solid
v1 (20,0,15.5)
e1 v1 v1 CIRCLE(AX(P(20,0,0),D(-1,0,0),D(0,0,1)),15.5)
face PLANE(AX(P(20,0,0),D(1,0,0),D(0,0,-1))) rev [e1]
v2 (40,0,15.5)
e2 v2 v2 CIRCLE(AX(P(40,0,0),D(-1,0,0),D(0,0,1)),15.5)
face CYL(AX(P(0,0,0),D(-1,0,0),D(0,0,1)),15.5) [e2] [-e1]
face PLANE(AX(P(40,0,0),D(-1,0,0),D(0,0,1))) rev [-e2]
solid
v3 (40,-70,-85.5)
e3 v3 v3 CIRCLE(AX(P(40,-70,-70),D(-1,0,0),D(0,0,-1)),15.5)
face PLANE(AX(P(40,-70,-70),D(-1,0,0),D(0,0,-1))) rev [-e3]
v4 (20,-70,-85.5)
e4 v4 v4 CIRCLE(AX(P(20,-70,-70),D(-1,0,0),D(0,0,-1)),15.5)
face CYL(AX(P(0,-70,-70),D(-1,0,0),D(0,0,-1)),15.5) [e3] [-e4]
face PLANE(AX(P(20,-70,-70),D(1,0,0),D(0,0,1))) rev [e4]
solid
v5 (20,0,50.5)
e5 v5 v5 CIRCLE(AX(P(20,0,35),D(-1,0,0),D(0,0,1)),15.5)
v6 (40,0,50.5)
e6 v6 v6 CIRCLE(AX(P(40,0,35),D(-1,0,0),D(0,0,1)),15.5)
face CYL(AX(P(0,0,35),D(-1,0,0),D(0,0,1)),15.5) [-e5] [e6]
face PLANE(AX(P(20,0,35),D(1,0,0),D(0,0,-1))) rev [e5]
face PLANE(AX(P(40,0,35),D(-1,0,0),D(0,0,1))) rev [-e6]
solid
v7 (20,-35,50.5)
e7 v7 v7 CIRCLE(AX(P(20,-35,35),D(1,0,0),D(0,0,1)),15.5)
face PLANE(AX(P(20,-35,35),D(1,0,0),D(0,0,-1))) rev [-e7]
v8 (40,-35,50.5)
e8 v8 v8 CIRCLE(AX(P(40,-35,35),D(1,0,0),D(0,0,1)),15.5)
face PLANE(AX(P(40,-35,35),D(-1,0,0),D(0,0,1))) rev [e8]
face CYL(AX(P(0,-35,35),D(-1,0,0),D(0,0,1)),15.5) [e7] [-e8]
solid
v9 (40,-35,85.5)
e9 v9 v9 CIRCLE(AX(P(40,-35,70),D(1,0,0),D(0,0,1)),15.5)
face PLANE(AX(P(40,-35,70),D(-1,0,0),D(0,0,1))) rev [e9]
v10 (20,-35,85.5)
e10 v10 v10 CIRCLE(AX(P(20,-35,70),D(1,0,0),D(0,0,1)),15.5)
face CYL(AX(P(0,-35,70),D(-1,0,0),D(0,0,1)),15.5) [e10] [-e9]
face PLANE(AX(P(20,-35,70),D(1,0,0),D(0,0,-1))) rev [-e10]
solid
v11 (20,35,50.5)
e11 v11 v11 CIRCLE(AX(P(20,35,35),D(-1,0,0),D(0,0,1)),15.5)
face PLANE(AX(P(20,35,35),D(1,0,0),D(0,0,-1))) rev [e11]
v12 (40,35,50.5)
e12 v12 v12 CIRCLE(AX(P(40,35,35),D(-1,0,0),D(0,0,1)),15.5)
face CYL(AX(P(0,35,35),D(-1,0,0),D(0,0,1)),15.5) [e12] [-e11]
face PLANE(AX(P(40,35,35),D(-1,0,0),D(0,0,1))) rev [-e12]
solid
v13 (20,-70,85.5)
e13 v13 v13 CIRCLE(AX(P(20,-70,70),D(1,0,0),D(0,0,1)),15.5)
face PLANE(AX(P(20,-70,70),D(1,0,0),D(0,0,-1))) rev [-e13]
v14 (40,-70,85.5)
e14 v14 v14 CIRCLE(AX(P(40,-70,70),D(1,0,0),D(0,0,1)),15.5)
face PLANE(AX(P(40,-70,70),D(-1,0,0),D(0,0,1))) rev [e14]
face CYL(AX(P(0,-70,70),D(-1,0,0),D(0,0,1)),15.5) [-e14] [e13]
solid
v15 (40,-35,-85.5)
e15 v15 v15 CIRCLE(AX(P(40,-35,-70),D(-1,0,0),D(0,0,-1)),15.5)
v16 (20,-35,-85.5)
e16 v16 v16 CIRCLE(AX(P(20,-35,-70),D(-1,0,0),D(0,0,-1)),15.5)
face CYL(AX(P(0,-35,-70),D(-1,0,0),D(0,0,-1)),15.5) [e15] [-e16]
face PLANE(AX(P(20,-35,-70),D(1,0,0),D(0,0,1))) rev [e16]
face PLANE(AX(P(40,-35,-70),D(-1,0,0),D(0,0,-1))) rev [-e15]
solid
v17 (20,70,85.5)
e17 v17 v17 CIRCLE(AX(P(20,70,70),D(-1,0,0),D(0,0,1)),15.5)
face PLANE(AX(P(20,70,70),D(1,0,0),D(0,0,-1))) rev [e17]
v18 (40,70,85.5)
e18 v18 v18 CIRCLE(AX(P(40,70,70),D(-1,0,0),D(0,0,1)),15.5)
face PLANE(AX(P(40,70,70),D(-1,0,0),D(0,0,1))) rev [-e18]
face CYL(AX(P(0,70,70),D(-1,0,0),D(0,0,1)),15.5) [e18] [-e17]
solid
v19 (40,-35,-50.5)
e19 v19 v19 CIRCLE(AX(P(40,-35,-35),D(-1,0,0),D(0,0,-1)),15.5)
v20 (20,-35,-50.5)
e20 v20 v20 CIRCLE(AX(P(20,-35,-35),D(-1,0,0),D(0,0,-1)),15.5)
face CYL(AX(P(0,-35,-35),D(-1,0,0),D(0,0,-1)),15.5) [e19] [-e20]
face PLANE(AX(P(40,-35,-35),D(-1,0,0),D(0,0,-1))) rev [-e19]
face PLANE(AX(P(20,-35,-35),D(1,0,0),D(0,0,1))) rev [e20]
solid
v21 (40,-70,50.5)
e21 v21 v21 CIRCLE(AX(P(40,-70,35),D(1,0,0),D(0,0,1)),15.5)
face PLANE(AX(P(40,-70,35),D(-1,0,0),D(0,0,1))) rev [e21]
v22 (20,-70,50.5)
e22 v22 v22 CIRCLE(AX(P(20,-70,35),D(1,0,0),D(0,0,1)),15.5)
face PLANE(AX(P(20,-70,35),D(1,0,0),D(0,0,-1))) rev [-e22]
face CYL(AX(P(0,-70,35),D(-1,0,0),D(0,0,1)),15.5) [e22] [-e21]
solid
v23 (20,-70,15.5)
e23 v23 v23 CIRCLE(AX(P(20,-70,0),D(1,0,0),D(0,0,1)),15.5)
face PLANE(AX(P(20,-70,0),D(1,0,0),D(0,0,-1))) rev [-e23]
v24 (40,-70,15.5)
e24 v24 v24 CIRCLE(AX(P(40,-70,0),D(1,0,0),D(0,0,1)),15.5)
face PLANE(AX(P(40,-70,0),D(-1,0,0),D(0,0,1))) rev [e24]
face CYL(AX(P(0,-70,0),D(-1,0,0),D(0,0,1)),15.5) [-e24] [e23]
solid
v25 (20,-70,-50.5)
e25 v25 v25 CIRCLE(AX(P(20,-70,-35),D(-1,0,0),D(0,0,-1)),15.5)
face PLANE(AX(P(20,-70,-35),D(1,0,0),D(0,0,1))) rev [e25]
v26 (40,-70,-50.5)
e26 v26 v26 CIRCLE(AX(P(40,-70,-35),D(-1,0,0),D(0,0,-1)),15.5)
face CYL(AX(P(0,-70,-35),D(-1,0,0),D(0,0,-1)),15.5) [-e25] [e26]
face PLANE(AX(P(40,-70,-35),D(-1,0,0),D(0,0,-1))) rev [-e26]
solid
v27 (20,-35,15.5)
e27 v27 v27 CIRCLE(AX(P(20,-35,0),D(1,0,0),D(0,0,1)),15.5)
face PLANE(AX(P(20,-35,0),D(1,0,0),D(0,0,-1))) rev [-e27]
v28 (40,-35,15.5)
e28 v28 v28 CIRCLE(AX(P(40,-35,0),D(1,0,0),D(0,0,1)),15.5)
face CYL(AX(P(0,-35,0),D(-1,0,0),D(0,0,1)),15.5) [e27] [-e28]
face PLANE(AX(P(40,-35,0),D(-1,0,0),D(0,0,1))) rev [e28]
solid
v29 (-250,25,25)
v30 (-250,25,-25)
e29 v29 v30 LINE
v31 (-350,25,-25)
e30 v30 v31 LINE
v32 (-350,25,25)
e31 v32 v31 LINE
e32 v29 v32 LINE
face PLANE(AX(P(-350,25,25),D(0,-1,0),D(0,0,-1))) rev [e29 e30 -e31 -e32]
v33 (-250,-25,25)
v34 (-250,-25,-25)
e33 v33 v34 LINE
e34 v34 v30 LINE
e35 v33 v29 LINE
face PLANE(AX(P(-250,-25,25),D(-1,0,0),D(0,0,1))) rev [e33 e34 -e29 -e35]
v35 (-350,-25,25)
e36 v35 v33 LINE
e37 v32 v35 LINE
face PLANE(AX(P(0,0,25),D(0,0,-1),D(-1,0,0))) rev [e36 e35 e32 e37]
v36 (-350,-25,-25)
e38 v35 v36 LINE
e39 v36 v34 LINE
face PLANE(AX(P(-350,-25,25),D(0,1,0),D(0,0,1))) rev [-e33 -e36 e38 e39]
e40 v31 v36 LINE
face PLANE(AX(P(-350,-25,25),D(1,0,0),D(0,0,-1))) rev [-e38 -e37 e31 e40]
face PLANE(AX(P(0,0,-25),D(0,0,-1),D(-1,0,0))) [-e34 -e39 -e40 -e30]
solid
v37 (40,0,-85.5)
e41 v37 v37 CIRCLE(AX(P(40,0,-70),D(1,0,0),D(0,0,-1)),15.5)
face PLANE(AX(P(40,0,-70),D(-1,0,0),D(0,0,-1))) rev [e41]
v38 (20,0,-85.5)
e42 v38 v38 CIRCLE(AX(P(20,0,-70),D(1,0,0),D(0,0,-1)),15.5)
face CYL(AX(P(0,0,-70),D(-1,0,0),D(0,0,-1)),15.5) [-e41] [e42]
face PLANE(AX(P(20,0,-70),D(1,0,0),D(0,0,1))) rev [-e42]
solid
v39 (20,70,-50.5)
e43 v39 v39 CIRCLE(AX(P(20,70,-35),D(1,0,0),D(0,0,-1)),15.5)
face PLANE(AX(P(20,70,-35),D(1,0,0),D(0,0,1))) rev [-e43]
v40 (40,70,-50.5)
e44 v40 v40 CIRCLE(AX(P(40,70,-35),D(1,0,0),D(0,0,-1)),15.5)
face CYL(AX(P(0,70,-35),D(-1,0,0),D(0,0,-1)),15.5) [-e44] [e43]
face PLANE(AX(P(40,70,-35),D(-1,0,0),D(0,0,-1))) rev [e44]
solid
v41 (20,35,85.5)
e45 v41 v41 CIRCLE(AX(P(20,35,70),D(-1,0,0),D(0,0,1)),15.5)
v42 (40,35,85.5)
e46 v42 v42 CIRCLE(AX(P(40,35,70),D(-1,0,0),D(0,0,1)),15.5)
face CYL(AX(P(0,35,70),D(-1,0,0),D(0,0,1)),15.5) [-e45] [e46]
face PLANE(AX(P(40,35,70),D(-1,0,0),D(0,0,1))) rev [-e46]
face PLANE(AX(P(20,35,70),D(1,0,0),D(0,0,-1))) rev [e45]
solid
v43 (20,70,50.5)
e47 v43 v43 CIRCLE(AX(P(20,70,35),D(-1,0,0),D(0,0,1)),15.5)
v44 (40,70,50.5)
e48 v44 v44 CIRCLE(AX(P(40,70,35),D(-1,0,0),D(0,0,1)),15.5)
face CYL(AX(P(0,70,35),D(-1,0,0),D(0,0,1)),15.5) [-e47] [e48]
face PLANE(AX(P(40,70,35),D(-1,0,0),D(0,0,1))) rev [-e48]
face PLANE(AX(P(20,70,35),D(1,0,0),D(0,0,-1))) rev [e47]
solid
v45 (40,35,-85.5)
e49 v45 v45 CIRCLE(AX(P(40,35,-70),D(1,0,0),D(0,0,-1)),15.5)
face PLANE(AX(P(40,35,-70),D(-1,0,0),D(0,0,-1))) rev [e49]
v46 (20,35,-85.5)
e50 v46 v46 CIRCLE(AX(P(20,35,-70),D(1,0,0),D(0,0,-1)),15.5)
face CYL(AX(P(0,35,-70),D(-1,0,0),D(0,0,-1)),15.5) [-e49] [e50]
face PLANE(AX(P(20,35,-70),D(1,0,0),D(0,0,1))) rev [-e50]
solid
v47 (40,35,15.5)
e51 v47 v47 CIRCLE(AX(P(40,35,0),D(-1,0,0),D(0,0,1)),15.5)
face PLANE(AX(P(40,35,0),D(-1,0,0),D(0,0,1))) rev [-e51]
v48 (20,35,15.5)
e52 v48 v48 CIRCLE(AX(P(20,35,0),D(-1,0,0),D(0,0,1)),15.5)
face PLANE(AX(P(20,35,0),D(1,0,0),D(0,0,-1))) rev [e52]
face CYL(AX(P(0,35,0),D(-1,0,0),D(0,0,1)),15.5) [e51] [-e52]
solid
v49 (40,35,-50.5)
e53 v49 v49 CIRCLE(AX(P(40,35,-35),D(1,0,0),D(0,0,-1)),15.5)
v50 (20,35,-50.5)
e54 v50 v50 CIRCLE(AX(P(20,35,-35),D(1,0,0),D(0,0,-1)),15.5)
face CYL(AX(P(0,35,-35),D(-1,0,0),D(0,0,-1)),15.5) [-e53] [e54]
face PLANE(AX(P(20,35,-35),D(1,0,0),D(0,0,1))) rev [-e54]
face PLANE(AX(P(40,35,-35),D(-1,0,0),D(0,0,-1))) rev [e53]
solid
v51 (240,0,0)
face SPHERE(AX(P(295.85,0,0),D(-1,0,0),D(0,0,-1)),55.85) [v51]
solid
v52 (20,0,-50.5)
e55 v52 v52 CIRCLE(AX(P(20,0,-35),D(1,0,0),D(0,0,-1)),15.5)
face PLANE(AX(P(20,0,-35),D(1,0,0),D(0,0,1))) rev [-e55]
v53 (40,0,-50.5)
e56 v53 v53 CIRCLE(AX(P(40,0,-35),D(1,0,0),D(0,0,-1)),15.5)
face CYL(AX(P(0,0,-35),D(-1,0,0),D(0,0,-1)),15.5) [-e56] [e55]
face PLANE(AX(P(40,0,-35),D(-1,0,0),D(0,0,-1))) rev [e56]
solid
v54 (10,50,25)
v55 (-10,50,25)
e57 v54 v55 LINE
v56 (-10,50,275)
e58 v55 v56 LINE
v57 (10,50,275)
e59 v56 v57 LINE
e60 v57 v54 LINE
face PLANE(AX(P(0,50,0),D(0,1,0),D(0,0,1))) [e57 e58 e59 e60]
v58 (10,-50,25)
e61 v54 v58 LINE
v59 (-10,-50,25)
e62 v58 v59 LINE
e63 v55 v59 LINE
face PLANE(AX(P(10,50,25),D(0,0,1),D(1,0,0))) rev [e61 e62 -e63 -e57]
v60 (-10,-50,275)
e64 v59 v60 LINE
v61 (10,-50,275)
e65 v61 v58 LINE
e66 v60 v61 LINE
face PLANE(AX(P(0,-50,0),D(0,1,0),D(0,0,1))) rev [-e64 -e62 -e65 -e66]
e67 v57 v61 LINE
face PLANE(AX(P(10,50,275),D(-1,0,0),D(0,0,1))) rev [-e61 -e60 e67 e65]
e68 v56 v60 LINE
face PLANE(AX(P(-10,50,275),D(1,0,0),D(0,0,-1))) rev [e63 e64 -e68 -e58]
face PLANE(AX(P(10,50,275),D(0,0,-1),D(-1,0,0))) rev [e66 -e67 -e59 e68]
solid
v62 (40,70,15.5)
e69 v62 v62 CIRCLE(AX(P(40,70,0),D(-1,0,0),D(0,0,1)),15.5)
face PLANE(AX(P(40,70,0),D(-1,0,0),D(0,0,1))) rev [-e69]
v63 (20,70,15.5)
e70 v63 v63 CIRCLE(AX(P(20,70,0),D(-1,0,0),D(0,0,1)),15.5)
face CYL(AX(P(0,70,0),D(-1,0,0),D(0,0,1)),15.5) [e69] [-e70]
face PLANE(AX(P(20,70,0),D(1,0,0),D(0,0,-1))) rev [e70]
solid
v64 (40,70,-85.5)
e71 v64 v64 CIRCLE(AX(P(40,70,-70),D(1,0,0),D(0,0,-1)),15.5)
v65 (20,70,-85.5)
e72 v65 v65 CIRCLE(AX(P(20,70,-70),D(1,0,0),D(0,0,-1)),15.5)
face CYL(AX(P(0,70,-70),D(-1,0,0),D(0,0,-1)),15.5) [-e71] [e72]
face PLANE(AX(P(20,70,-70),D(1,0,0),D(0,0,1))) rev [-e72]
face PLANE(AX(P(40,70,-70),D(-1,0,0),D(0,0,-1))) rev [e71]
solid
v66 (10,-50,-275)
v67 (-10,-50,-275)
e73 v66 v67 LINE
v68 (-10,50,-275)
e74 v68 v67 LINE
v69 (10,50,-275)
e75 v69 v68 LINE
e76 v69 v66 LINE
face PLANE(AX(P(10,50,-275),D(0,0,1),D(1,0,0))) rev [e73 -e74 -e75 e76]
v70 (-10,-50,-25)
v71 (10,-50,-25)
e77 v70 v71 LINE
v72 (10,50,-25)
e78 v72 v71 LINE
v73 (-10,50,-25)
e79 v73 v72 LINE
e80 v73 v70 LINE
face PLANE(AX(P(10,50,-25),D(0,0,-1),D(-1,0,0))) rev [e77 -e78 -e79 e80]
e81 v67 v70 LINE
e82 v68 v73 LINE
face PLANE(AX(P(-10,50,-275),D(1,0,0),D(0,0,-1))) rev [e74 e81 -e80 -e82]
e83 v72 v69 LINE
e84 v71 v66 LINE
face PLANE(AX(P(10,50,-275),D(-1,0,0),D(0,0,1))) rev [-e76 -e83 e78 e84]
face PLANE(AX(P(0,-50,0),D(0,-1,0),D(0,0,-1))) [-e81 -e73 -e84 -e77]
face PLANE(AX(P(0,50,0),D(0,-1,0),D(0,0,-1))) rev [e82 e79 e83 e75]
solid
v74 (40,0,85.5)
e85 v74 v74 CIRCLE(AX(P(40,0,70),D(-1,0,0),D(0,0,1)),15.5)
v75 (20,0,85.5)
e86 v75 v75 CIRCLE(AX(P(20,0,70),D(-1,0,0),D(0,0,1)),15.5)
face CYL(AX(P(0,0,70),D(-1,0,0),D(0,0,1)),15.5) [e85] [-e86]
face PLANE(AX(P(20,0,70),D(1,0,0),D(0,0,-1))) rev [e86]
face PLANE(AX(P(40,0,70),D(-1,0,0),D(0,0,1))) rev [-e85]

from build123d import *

# Parameters (mm, degrees)
SKETCH2_W             = 100
SKETCH2_H             = 50
BOSS_EXTRUDE2_DEPTH   = 25
SKETCH3_W             = 20
SKETCH3_H             = 15.5
SKETCH4_W             = 20
SKETCH4_H             = 250
BOSS_EXTRUDE3_DEPTH   = 50
BOSS_EXTRUDE3_2_DEPTH = 50
LPATTERN1_START       = 20
LPATTERN1_OUTLINE_R   = 15.5
LPATTERN1_DEPTH       = 20


# Read off the part's stored shape, not the designer's step: LPattern1
with BuildPart() as part:
    # Sketch2 → Boss-Extrude2 (new, symmetric)
    with BuildSketch(Plane.XY):
        with Locations((-300, 0)):
            Rectangle(SKETCH2_W, SKETCH2_H)
    extrude(amount=BOSS_EXTRUDE2_DEPTH, both=True)


with BuildPart() as body_2:
    # Sketch3 → Revolve1 (revolve)
    with BuildSketch(Plane(origin=(0, 0, 0), x_dir=(1, 0, 0), z_dir=(0, 1, 0))):
        with BuildLine():
            Line((240, 0), (351.7, 0))
            ThreePointArc((351.7, 0), (295.85, 55.85), (240, 0))
        make_face()
        with Locations((30, 7.75)):
            Rectangle(SKETCH3_W, SKETCH3_H)
    revolve(axis=Axis((0, 0, 0), (1, 0, 0)))


with BuildPart() as body_3:
    # Sketch4 → Boss-Extrude3 (new, symmetric)
    with BuildSketch(Plane(origin=(0, 0, 0), x_dir=(1, 0, 0), z_dir=(0, 1, 0))):
        with Locations((0, 150)):
            Rectangle(SKETCH4_W, SKETCH4_H)
    extrude(amount=BOSS_EXTRUDE3_DEPTH, both=True)


with BuildPart() as body_4:
    # Sketch4 → Boss-Extrude3 2 (new, symmetric)
    with BuildSketch(Plane(origin=(0, 0, 0), x_dir=(1, 0, 0), z_dir=(0, 1, 0))):
        with Locations((0, -150)):
            Rectangle(SKETCH4_W, SKETCH4_H)
    extrude(amount=BOSS_EXTRUDE3_2_DEPTH, both=True)


with BuildPart() as body_5:
    # LPattern1 outline → LPattern1 (new body)
    with BuildSketch(Plane.YZ.offset(LPATTERN1_START)):
        with Locations((70, 70)):
            Circle(LPATTERN1_OUTLINE_R)
        with Locations((70, 35)):
            Circle(LPATTERN1_OUTLINE_R)
        with Locations((70, 0)):
            Circle(LPATTERN1_OUTLINE_R)
        with Locations((35, 70)):
            Circle(LPATTERN1_OUTLINE_R)
        with Locations((35, 35)):
            Circle(LPATTERN1_OUTLINE_R)
        with Locations((35, 0)):
            Circle(LPATTERN1_OUTLINE_R)
        with Locations((0, 70)):
            Circle(LPATTERN1_OUTLINE_R)
        with Locations((0, 35)):
            Circle(LPATTERN1_OUTLINE_R)
    extrude(amount=LPATTERN1_DEPTH)

    # Mirror1: body 5 across plane


with BuildPart() as body_5_1:
    add(body_5.part)
    add(body_5.part.mirror(Plane.XY))

    # Mirror2: body 5 across plane


with BuildPart() as body_5_2:
    add(body_5_1.part)
    add(body_5_1.part.mirror(Plane.ZX))


solid = Compound([part.part, body_2.part, body_3.part, body_4.part, body_5_2.part])
